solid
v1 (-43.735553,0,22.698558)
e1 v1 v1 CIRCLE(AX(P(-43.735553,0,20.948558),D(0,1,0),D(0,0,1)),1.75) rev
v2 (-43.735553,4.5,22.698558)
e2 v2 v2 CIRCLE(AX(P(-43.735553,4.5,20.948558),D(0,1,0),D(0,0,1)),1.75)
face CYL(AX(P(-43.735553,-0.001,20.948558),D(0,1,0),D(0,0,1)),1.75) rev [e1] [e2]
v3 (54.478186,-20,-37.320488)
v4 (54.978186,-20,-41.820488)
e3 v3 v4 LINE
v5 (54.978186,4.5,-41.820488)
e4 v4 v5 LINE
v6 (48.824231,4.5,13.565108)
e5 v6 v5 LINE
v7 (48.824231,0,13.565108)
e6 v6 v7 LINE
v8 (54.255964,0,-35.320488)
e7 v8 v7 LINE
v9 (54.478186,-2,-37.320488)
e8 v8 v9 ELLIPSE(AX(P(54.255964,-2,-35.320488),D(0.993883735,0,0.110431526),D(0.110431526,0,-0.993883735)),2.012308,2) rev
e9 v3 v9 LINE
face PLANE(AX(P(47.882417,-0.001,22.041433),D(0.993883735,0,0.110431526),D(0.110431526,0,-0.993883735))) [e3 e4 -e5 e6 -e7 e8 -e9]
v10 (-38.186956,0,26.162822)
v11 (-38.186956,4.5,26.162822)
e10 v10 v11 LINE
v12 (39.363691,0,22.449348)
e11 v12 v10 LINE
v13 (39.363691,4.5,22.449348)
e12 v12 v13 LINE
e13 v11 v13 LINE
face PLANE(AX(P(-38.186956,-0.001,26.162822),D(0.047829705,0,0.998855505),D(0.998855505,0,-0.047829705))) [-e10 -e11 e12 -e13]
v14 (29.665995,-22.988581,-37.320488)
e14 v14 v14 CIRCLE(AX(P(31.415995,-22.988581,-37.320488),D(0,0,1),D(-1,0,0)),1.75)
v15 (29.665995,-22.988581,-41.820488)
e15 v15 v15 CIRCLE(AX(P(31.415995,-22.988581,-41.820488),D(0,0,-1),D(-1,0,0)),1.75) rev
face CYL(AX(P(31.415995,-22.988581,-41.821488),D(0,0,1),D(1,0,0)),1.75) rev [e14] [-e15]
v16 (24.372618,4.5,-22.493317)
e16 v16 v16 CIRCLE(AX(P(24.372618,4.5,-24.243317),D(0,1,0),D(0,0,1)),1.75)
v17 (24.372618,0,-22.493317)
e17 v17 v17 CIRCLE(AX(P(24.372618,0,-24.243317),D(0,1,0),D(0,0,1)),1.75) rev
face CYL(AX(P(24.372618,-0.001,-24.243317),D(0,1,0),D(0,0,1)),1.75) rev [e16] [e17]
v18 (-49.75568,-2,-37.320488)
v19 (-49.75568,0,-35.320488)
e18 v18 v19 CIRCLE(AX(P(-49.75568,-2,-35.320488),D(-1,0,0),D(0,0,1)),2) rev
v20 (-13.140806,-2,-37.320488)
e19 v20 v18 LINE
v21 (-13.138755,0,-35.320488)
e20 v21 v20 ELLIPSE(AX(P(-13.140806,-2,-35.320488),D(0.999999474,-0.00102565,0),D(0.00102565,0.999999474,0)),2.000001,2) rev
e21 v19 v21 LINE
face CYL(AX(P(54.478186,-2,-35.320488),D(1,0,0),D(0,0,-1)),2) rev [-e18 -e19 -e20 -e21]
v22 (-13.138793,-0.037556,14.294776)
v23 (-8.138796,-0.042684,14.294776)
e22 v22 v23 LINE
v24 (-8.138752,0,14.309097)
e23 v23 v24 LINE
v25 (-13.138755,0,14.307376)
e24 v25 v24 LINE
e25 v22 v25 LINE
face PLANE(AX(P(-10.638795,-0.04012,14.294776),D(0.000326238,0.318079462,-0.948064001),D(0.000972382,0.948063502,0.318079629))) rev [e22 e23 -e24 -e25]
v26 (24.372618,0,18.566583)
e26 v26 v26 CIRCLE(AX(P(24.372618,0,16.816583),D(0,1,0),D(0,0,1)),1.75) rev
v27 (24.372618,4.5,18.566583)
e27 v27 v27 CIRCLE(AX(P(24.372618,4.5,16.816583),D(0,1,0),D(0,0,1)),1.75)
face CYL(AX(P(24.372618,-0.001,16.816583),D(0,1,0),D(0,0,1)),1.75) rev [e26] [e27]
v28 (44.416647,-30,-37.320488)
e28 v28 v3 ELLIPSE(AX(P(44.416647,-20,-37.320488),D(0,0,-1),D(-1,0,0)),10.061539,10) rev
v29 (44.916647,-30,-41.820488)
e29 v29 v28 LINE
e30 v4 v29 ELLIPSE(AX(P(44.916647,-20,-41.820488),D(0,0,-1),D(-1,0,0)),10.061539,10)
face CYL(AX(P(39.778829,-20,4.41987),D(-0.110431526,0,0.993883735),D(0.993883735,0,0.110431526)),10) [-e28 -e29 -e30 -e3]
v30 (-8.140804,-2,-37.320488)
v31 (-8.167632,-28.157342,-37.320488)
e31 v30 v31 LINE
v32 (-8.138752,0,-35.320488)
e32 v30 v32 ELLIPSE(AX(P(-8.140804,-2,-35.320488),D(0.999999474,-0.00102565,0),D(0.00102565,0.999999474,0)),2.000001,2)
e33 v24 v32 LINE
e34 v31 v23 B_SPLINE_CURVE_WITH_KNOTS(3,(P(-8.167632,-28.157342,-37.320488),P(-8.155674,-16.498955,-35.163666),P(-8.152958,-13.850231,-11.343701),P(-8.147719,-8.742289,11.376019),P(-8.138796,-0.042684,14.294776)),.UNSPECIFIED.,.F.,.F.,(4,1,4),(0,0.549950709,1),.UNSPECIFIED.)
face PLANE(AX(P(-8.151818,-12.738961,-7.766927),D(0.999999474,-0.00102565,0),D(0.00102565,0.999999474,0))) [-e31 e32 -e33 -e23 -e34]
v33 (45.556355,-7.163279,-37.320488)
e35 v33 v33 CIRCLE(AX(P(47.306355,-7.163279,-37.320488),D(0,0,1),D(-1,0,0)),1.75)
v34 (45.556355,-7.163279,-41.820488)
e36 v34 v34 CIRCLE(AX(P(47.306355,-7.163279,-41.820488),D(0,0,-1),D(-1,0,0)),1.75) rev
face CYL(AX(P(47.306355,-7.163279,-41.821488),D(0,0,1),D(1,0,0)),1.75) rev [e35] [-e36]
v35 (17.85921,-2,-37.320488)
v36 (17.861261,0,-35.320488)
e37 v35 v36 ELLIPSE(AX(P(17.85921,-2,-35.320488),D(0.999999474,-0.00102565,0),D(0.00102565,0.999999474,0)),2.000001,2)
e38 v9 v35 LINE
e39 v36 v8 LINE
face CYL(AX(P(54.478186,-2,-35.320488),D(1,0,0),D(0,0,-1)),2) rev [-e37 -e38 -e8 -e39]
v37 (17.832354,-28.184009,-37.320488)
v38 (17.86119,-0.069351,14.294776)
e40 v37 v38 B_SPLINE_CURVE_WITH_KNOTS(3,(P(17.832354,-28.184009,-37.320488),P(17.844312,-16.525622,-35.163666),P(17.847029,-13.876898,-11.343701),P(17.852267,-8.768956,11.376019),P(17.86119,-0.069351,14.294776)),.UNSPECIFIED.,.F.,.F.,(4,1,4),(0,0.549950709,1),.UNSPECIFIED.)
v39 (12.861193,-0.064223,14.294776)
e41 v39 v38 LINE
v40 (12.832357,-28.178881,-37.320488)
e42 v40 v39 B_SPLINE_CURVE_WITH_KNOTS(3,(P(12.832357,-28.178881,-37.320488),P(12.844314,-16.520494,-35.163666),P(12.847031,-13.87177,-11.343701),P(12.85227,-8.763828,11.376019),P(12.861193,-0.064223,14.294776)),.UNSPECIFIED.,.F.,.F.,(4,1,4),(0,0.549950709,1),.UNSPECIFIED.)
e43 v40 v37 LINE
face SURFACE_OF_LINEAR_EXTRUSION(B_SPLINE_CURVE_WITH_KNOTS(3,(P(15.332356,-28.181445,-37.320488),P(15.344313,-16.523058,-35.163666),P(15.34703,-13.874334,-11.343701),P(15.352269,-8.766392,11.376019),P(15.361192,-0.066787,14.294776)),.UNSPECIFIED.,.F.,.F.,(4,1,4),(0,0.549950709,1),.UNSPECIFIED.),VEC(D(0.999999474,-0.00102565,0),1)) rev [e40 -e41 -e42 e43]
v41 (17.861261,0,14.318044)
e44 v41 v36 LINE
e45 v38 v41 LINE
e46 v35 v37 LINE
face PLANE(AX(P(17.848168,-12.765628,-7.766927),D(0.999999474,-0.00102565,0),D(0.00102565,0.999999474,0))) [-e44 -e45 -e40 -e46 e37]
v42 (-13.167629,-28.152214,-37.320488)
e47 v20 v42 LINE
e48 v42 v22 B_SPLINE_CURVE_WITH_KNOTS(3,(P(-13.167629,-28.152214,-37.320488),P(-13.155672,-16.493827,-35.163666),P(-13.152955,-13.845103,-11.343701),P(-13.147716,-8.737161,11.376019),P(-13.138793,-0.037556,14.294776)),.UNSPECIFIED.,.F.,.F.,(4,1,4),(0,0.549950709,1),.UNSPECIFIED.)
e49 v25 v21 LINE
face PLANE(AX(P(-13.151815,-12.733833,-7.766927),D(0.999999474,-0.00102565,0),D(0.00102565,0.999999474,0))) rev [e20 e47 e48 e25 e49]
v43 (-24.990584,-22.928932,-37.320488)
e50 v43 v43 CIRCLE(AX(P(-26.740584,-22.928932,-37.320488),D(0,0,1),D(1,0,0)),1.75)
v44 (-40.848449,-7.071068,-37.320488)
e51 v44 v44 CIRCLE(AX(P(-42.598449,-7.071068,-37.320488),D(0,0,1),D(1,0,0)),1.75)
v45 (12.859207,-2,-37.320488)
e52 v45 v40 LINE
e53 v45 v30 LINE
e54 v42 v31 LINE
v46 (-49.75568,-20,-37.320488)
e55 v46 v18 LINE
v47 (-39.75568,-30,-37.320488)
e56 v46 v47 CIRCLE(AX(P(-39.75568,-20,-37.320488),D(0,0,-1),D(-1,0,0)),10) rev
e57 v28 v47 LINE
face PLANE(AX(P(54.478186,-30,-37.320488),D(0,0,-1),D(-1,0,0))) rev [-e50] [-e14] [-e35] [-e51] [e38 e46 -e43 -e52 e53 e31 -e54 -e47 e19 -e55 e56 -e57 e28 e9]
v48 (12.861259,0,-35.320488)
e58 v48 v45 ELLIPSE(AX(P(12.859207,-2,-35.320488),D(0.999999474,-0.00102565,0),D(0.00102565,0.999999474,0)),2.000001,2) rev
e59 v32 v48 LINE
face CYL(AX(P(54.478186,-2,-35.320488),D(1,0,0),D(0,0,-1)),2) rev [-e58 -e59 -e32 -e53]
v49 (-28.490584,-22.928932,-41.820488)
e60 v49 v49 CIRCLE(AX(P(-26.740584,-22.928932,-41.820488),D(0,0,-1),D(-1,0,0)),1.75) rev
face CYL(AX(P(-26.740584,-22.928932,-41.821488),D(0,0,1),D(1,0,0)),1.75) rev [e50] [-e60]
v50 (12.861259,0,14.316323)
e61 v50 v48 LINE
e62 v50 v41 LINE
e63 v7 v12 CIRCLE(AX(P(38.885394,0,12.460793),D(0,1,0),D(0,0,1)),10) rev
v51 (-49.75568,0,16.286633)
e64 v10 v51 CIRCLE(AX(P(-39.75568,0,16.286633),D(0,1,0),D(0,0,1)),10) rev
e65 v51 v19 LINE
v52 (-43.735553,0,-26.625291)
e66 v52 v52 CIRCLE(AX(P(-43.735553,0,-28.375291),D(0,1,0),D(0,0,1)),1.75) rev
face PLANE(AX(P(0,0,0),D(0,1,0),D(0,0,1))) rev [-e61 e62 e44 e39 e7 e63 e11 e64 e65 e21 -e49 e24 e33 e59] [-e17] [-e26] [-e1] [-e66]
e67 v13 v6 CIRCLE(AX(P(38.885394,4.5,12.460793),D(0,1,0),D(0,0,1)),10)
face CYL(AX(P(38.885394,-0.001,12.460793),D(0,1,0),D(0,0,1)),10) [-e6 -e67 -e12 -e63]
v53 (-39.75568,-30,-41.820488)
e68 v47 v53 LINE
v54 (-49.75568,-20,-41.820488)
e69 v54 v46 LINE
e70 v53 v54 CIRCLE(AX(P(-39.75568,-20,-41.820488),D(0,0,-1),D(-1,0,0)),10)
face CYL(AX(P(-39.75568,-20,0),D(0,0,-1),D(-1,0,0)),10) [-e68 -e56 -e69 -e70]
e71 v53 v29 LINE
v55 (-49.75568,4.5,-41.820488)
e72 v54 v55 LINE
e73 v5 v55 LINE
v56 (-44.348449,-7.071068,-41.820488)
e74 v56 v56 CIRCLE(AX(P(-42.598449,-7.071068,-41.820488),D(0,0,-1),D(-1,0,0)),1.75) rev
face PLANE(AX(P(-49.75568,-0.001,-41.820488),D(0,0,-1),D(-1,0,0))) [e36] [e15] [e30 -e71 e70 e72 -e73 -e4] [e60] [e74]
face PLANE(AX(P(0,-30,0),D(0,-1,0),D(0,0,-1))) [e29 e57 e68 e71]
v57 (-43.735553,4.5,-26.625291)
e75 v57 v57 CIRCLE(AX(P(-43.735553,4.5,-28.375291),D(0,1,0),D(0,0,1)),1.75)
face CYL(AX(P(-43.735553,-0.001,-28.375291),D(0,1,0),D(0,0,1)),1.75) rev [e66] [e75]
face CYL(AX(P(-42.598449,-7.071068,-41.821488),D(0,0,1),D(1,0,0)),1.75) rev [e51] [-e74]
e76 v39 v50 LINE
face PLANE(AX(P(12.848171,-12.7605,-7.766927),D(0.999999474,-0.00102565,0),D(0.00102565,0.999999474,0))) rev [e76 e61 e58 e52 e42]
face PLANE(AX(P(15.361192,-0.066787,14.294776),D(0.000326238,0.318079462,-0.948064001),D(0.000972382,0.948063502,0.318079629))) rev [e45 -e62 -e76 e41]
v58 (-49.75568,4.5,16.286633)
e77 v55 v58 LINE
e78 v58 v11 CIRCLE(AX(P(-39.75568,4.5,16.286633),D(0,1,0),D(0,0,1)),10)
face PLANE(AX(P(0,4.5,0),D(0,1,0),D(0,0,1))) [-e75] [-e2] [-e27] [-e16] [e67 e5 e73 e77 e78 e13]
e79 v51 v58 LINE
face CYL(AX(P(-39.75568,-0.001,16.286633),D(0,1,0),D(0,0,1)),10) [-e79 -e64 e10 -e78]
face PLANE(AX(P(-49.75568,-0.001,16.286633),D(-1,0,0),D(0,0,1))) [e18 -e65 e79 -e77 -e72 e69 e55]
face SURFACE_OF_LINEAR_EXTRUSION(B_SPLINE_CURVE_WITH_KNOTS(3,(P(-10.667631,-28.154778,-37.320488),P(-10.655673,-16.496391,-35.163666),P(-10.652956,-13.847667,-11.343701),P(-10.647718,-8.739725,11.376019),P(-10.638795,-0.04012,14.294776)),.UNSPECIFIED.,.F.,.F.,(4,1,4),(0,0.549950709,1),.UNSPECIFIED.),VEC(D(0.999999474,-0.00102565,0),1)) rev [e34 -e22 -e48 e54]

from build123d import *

# Parameters (mm, degrees)
SKETCH2_W           = 132.54933421
SKETCH2_H           = 96.472398488
BOSS_EXTRUDE1_DEPTH = 4.5
CUT_EXTRUDE1_REACH  = 84.093
SKETCH3_R           = 1.75
CUT_EXTRUDE2_REACH  = 84.093
SKETCH4_W           = 132.54933421
SKETCH4_H           = 96.472398488
FILLET1_R           = 10
BOSS_EXTRUDE2_DEPTH = 30
FILLET2_R           = 10
CUT_EXTRUDE3_REACH  = 91.266
SKETCH6_R           = 1.75
RIB1_START          = -2.5
RIB1_DEPTH          = 5
RIB2_START          = -2.5
RIB2_DEPTH          = 5
FILLET3_R           = 2


with BuildPart() as part:
    # Sketch2 → Boss-Extrude1 (new body)
    with BuildSketch(Plane(origin=(0, 0, 0), x_dir=(1, 0, 0), z_dir=(0, 1, 0))):
        Rectangle(SKETCH2_W, SKETCH2_H)
    extrude(amount=BOSS_EXTRUDE1_DEPTH)

    # Sketch3 → Cut-Extrude1 (cut, up to next)
    with BuildSketch(Plane(origin=(0, 4.5, 0), x_dir=(1, 0, 0), z_dir=(0, 1, 0)), mode=Mode.PRIVATE) as cut_extrude1_sk1:
        with Locations(Location((-43.735552551, 28.375291395, 0), (0, 0, 270))):
            Circle(SKETCH3_R)
    cut_extrude1_tool1 = extrude(cut_extrude1_sk1.sketch, amount=-CUT_EXTRUDE1_REACH, mode=Mode.PRIVATE) & part.part
    # Sketch3 → Cut-Extrude1 (cut, up to next)
    with BuildSketch(Plane(origin=(0, 4.5, 0), x_dir=(1, 0, 0), z_dir=(0, 1, 0)), mode=Mode.PRIVATE) as cut_extrude1_sk2:
        with Locations(Location((-43.735552551, -20.948558002, 0), (0, 0, 270))):
            Circle(SKETCH3_R)
    cut_extrude1_tool2 = extrude(cut_extrude1_sk2.sketch, amount=-CUT_EXTRUDE1_REACH, mode=Mode.PRIVATE) & part.part
    # Sketch3 → Cut-Extrude1 (cut, up to next)
    with BuildSketch(Plane(origin=(0, 4.5, 0), x_dir=(1, 0, 0), z_dir=(0, 1, 0)), mode=Mode.PRIVATE) as cut_extrude1_sk3:
        with Locations(Location((24.372618491, -16.816583266, 0), (0, 0, 270))):
            Circle(SKETCH3_R)
    cut_extrude1_tool3 = extrude(cut_extrude1_sk3.sketch, amount=-CUT_EXTRUDE1_REACH, mode=Mode.PRIVATE) & part.part
    # Sketch3 → Cut-Extrude1 (cut, up to next)
    with BuildSketch(Plane(origin=(0, 4.5, 0), x_dir=(1, 0, 0), z_dir=(0, 1, 0)), mode=Mode.PRIVATE) as cut_extrude1_sk4:
        with Locations(Location((24.372618491, 24.243316659, 0), (0, 0, 270))):
            Circle(SKETCH3_R)
    cut_extrude1_tool4 = extrude(cut_extrude1_sk4.sketch, amount=-CUT_EXTRUDE1_REACH, mode=Mode.PRIVATE) & part.part
    add(cut_extrude1_tool1.solids().sort_by_distance((-43.735553, 4.5, -28.375291))[0], mode=Mode.SUBTRACT)
    add(cut_extrude1_tool2.solids().sort_by_distance((-43.735553, 4.5, 20.948558))[0], mode=Mode.SUBTRACT)
    add(cut_extrude1_tool3.solids().sort_by_distance((24.372618, 4.5, 16.816583))[0], mode=Mode.SUBTRACT)
    add(cut_extrude1_tool4.solids().sort_by_distance((24.372618, 4.5, -24.243317))[0], mode=Mode.SUBTRACT)

    # Sketch4 → Cut-Extrude2 (cut, up to next)
    with BuildSketch(Plane(origin=(0, 4.5, 0), x_dir=(1, 0, 0), z_dir=(0, 1, 0)), mode=Mode.PRIVATE) as cut_extrude2_sk1:
        Rectangle(SKETCH4_W, SKETCH4_H)
        with BuildLine():
            Line((-49.755679651, -16.286633303), (-49.755679651, 41.820488279))
            Line((-49.755679651, 41.820488279), (54.978186069, 41.820488279))
            Line((54.978186069, 41.820488279), (47.882417092, -22.041432557))
            Line((47.882417092, -22.041432557), (-38.186956222, -26.162822184))
            ThreePointArc((-38.186956222, -26.162822184), (-46.248474339, -23.892132442), (-49.755679651, -16.286633303))
        make_face(mode=Mode.SUBTRACT)
    cut_extrude2_tool1 = extrude(cut_extrude2_sk1.sketch, amount=-CUT_EXTRUDE2_REACH, mode=Mode.PRIVATE) & part.part
    add(cut_extrude2_tool1.solids().sort_by_distance((-64.635269, 4.5, 0))[0], mode=Mode.SUBTRACT)

    # Fillet1
    fillet1_edges = [part.edges().sort_by_distance(p)[0] for p in [
        (47.882417092, 2.25, 22.041432557),
    ]]
    fillet(fillet1_edges, radius=FILLET1_R)

    # Sketch5 → Boss-Extrude2 (add)
    with BuildSketch(Plane.XZ):
        Polygon((-49.755679651, -37.320488279), (-49.755679651, -41.820488279), (54.978186069, -41.820488279), (54.478186069, -37.320488279), align=None)
    extrude(amount=BOSS_EXTRUDE2_DEPTH)

    # Fillet2
    fillet2_edges = [part.edges().sort_by_distance(p)[0] for p in [
        (-49.755679651, -30, -39.570488279),
        (54.728186069, -30, -39.570488279),
    ]]
    fillet(fillet2_edges, radius=FILLET2_R)

    # Sketch6 → Cut-Extrude3 (cut, up to next)
    with BuildSketch(Plane.XY.offset(-37.320488279), mode=Mode.PRIVATE) as cut_extrude3_sk1:
        with Locations((-42.5984485, -7.071067812)):
            Circle(SKETCH6_R)
    cut_extrude3_tool1 = extrude(cut_extrude3_sk1.sketch, amount=-CUT_EXTRUDE3_REACH, mode=Mode.PRIVATE) & part.part
    # Sketch6 → Cut-Extrude3 (cut, up to next)
    with BuildSketch(Plane.XY.offset(-37.320488279), mode=Mode.PRIVATE) as cut_extrude3_sk2:
        with Locations((-26.740584124, -22.928932188)):
            Circle(SKETCH6_R)
    cut_extrude3_tool2 = extrude(cut_extrude3_sk2.sketch, amount=-CUT_EXTRUDE3_REACH, mode=Mode.PRIVATE) & part.part
    # Sketch6 → Cut-Extrude3 (cut, up to next)
    with BuildSketch(Plane.XY.offset(-37.320488279), mode=Mode.PRIVATE) as cut_extrude3_sk3:
        with Locations(Location((31.415995213, -22.988580525, 0), (0, 0, 180))):
            Circle(SKETCH6_R)
    cut_extrude3_tool3 = extrude(cut_extrude3_sk3.sketch, amount=-CUT_EXTRUDE3_REACH, mode=Mode.PRIVATE) & part.part
    # Sketch6 → Cut-Extrude3 (cut, up to next)
    with BuildSketch(Plane.XY.offset(-37.320488279), mode=Mode.PRIVATE) as cut_extrude3_sk4:
        with Locations(Location((47.306355451, -7.163278737, 0), (0, 0, 180))):
            Circle(SKETCH6_R)
    cut_extrude3_tool4 = extrude(cut_extrude3_sk4.sketch, amount=-CUT_EXTRUDE3_REACH, mode=Mode.PRIVATE) & part.part
    add(cut_extrude3_tool1.solids().sort_by_distance((-42.598449, -7.071068, -37.320488))[0], mode=Mode.SUBTRACT)
    add(cut_extrude3_tool2.solids().sort_by_distance((-26.740584, -22.928932, -37.320488))[0], mode=Mode.SUBTRACT)
    add(cut_extrude3_tool3.solids().sort_by_distance((31.415995, -22.988581, -37.320488))[0], mode=Mode.SUBTRACT)
    add(cut_extrude3_tool4.solids().sort_by_distance((47.306355, -7.163279, -37.320488))[0], mode=Mode.SUBTRACT)

    # Rib1: read off the stored shape, not the designer's step
    # Rib1 outline → Rib1 (add)
    with BuildSketch(Plane(origin=(-10.638742437, 0.010911634, 0), x_dir=(0.001025650165390613, 0.9999994740207309, 0), z_dir=(0.9999994740207307, -0.0010256501653906128, 0)).offset(RIB1_START)):
        with BuildLine():
            Line((-0.008347513, -37.320488279), (-0.008347513, 14.309096835))
            Line((-0.008347513, 14.309096835), (-0.051031921, 14.294776029))
            add(Edge.make_bspline(
                [(-28.165704325, -37.320488279), (-16.507311445, -35.163666341), (-13.858586231, -11.343701008), (-8.750641214, 11.37601897), (-0.051031921, 14.294776029)],
                knots=[0, 0, 0, 0, 0.549950709, 1, 1, 1, 1], degree=3))
            Line((-28.165704325, -37.320488279), (-0.008347513, -37.320488279))
        make_face()
    extrude(amount=RIB1_DEPTH)

    # Rib2: read off the stored shape, not the designer's step
    # Rib2 outline → Rib2 (add)
    with BuildSketch(Plane(origin=(15.361243887, -0.015755271, 0), x_dir=(0.001025650165390613, 0.9999994740207309, 0), z_dir=(0.9999994740207307, -0.0010256501653906128, 0)).offset(RIB2_START)):
        with BuildLine():
            Line((0.018319406, -37.320488279), (0.018319406, 14.318043703))
            Line((0.018319406, 14.318043703), (-0.051031921, 14.294776029))
            add(Edge.make_bspline(
                [(-28.165704325, -37.320488279), (-16.507311445, -35.163666341), (-13.858586231, -11.343701008), (-8.750641214, 11.37601897), (-0.051031921, 14.294776029)],
                knots=[0, 0, 0, 0, 0.549950709, 1, 1, 1, 1], degree=3))
            Line((-28.165704325, -37.320488279), (0.018319406, -37.320488279))
        make_face()
    extrude(amount=RIB2_DEPTH)

    # Fillet3
    fillet3_edges = [part.edges().sort_by_distance(p)[0] for p in [
        (-31.447217297, 0, -37.320488279),
        (2.361253209, 0, -37.320488279),
        (36.169723715, 0, -37.320488279),
    ]]
    fillet(fillet3_edges, radius=FILLET3_R)


solid = part.part
